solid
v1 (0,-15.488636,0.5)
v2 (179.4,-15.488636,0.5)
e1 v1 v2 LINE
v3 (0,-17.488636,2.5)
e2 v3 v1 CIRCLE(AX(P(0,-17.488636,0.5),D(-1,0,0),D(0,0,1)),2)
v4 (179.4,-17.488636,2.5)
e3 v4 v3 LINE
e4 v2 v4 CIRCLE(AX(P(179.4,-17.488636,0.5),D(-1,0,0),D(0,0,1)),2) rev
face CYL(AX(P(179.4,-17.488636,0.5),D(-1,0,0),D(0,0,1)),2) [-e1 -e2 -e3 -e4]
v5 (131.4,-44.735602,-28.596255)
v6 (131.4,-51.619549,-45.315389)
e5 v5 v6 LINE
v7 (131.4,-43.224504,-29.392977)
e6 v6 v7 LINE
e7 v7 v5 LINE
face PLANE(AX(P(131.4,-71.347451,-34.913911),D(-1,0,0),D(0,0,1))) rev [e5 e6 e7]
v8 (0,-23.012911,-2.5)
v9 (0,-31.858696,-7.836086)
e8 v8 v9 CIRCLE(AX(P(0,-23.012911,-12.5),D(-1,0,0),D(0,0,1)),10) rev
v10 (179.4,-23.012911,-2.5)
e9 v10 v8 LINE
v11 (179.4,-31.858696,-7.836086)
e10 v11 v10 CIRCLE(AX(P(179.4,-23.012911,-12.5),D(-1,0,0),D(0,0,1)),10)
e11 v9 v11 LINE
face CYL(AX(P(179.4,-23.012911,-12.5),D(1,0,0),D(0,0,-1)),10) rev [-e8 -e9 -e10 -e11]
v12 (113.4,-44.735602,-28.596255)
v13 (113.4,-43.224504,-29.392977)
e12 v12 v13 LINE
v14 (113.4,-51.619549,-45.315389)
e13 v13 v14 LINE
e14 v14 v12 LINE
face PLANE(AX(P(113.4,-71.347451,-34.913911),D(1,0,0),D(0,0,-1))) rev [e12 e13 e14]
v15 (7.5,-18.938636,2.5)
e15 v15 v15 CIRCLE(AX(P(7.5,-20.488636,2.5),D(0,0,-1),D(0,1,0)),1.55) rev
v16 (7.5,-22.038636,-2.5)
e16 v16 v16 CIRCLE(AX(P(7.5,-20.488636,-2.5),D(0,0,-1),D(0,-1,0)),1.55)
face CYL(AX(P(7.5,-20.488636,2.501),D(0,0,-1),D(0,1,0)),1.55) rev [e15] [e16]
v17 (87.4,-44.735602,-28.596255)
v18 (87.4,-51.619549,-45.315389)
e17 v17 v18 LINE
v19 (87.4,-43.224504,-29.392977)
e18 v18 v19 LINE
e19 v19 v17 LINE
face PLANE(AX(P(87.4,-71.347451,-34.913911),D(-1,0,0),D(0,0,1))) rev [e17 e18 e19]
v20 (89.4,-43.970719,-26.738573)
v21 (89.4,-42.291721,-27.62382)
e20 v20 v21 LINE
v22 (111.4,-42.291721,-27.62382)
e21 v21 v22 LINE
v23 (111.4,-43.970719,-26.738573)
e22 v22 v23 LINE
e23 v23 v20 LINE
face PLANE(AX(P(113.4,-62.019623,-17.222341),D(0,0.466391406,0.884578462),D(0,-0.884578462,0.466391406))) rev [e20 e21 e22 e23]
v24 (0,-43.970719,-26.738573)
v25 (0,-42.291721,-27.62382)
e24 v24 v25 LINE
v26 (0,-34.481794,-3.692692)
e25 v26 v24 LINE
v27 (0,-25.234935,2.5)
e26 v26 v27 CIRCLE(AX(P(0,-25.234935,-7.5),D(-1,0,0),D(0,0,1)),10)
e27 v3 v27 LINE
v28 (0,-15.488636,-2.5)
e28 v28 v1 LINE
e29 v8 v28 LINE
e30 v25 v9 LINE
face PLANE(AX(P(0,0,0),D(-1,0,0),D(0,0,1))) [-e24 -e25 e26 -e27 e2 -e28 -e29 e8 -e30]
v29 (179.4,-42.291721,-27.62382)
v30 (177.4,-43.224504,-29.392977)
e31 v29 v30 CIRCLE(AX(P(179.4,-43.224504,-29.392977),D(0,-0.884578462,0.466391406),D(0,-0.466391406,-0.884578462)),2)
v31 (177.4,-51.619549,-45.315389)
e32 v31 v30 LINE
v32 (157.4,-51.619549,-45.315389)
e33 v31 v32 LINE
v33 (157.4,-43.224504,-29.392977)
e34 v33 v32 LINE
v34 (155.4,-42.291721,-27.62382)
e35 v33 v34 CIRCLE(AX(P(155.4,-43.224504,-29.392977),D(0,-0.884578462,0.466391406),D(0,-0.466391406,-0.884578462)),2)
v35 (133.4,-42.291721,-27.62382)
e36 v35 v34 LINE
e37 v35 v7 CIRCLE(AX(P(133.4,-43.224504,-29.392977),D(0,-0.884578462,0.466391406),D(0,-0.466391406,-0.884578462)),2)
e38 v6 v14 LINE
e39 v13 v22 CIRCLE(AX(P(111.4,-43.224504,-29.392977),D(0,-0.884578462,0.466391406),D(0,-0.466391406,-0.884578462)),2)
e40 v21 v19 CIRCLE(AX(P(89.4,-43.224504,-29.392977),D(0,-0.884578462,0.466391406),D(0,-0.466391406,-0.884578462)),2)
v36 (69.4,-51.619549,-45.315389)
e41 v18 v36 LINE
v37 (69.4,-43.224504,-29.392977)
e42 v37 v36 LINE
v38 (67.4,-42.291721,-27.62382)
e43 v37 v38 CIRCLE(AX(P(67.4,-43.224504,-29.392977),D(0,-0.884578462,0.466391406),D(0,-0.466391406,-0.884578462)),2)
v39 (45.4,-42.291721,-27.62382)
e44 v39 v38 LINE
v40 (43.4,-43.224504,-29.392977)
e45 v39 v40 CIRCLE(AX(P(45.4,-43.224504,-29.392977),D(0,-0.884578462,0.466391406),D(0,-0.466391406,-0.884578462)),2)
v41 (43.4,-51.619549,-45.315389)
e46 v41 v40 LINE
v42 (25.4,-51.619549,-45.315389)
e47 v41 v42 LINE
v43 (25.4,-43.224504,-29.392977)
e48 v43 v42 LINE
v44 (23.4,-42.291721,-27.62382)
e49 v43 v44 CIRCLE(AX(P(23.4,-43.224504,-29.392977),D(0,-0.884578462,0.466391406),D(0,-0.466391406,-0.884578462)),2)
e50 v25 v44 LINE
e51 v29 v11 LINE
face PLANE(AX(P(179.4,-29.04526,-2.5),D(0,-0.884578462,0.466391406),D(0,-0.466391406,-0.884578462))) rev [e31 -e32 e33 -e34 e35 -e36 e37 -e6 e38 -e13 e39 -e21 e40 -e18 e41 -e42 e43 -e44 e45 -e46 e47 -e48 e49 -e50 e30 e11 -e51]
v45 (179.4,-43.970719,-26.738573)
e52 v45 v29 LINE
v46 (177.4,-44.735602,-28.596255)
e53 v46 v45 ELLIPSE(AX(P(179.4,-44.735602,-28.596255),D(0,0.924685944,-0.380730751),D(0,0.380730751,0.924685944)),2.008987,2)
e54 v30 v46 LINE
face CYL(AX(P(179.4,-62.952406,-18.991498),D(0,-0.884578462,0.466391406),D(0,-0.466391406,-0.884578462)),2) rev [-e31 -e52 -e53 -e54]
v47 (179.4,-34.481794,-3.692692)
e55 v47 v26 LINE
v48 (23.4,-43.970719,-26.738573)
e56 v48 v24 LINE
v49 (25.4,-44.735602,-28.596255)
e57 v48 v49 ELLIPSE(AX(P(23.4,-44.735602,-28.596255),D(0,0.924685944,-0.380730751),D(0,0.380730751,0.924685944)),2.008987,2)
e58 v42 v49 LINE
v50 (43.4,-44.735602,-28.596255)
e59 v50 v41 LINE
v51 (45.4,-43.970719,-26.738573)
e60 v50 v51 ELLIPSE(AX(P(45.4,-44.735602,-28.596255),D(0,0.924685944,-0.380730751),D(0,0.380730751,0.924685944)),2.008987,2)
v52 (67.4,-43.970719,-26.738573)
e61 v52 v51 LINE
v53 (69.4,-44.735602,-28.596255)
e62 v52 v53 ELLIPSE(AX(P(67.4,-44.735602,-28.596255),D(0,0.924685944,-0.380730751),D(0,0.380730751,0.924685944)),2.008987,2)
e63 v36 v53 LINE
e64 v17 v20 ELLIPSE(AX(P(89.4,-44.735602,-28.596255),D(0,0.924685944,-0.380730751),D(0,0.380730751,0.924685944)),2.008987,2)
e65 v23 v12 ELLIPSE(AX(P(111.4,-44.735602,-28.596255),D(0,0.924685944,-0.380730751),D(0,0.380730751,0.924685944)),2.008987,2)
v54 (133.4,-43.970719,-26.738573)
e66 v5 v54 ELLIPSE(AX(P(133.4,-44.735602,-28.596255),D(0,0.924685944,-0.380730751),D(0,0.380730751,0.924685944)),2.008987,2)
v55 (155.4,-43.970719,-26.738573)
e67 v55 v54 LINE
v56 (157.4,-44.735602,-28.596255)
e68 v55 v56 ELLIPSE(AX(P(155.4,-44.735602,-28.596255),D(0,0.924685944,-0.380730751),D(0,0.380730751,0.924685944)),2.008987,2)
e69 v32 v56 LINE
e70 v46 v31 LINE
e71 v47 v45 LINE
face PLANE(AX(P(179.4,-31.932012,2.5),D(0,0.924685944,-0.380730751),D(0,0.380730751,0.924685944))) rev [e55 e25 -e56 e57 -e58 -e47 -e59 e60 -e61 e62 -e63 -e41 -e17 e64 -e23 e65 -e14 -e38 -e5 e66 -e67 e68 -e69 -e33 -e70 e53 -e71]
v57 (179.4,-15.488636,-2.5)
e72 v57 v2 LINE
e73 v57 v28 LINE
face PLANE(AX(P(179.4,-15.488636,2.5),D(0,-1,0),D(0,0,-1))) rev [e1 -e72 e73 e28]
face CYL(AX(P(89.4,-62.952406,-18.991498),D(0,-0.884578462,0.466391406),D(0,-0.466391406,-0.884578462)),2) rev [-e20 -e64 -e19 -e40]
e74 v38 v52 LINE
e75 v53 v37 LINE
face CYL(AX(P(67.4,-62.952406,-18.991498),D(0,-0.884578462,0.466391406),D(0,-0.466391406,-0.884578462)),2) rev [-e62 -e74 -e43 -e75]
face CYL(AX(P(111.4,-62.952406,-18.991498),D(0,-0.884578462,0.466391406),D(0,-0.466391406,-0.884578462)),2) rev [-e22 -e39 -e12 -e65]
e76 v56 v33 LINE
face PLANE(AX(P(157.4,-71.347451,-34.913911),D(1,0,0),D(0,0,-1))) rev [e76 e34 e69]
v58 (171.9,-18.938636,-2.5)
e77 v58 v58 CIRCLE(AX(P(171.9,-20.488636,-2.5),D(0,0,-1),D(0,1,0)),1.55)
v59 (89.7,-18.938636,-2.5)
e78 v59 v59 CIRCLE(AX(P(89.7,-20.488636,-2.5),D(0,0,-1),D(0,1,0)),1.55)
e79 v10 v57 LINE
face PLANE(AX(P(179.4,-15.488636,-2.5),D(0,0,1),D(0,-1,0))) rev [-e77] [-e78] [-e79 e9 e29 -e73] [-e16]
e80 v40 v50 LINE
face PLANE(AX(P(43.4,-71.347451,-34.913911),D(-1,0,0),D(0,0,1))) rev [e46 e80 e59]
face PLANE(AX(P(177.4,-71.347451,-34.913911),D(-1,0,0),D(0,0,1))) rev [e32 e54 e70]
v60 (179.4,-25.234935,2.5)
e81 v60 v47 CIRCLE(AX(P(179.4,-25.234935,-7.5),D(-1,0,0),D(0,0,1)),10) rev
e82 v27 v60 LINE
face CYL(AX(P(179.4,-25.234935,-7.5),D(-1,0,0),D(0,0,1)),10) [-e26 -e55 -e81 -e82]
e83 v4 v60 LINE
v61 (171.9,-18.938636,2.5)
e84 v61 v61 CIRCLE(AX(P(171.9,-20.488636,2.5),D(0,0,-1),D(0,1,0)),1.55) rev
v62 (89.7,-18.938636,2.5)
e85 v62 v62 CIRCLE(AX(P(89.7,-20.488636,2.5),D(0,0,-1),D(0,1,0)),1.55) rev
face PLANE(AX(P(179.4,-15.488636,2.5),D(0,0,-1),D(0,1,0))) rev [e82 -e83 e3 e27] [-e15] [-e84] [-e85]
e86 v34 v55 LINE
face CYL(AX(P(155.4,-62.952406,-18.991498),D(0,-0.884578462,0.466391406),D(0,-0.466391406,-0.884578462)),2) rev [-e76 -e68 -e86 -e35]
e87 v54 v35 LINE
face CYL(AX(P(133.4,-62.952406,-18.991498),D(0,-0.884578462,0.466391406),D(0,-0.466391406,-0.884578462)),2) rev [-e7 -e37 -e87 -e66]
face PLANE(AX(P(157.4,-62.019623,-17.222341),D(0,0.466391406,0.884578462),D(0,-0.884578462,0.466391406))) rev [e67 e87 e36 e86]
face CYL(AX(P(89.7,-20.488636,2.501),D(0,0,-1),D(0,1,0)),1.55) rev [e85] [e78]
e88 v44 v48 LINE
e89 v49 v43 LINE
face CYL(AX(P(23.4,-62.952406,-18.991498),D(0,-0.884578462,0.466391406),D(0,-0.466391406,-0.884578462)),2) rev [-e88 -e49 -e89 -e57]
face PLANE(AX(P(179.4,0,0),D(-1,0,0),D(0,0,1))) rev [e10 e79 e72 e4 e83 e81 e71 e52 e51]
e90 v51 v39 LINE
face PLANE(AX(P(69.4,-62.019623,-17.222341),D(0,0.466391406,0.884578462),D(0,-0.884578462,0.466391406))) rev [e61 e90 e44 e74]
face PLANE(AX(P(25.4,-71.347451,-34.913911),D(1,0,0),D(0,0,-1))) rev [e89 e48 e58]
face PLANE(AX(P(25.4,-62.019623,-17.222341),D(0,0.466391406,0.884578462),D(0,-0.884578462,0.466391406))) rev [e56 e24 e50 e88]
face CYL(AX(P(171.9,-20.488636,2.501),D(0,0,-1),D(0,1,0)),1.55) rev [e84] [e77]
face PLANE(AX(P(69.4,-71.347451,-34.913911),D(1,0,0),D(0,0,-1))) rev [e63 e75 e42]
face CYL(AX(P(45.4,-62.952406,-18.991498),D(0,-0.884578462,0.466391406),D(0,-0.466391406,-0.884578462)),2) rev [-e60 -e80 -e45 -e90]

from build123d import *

# Parameters (mm, degrees)
BOSS_EXTRUDE1_DEPTH = 179.4
FILLET3_R           = 10
CUT_EXTRUDE3_REACH  = 193.526
SKETCH4_R           = 1.55
CUT_EXTRUDE5_REACH  = 192.528
SKETCH7_W           = 26
SKETCH7_H           = 20
SKETCH7_W_2         = 25.4
SKETCH7_W_3         = 2
FILLET6_R           = 2
FILLET7_R           = 2


with BuildPart() as part:
    # Sketch1 → Boss-Extrude1 (new body)
    with BuildSketch(Plane(origin=(0, 0, 0), x_dir=(0, 0, -1), z_dir=(1, 0, 0))):
        Polygon((-2.5, -15.488635846), (-2.5, -31.932011519), (45.315389352, -51.619548933), (2.5, -29.045260173), (2.5, -15.488635846), align=None)
    extrude(amount=BOSS_EXTRUDE1_DEPTH)

    # Fillet3
    fillet3_edges = [part.edges().sort_by_distance(p)[0] for p in [
        (89.7, -29.045260173, -2.5),
        (89.7, -31.932011519, 2.5),
    ]]
    fillet(fillet3_edges, radius=FILLET3_R)

    # Sketch4 → Cut-Extrude3 (cut, up to next)
    with BuildSketch(Plane(origin=(0, 0, -2.5), x_dir=(-1, 0, 0), z_dir=(0, 0, -1)), mode=Mode.PRIVATE) as cut_extrude3_sk1:
        with Locations(Location((-171.9, -20.488635846, 0), (0, 0, 90))):
            Circle(SKETCH4_R)
    cut_extrude3_tool1 = extrude(cut_extrude3_sk1.sketch, amount=-CUT_EXTRUDE3_REACH, mode=Mode.PRIVATE) & part.part
    # Sketch4 → Cut-Extrude3 (cut, up to next)
    with BuildSketch(Plane(origin=(0, 0, -2.5), x_dir=(-1, 0, 0), z_dir=(0, 0, -1)), mode=Mode.PRIVATE) as cut_extrude3_sk2:
        with Locations(Location((-7.5, -20.488635846, 0), (0, 0, 90))):
            Circle(SKETCH4_R)
    cut_extrude3_tool2 = extrude(cut_extrude3_sk2.sketch, amount=-CUT_EXTRUDE3_REACH, mode=Mode.PRIVATE) & part.part
    # Sketch4 → Cut-Extrude3 (cut, up to next)
    with BuildSketch(Plane(origin=(0, 0, -2.5), x_dir=(-1, 0, 0), z_dir=(0, 0, -1)), mode=Mode.PRIVATE) as cut_extrude3_sk3:
        with Locations(Location((-89.7, -20.488635846, 0), (0, 0, 90))):
            Circle(SKETCH4_R)
    cut_extrude3_tool3 = extrude(cut_extrude3_sk3.sketch, amount=-CUT_EXTRUDE3_REACH, mode=Mode.PRIVATE) & part.part
    add(cut_extrude3_tool1.solids().sort_by_distance((171.9, -20.488636, -2.5))[0], mode=Mode.SUBTRACT)
    add(cut_extrude3_tool2.solids().sort_by_distance((7.5, -20.488636, -2.5))[0], mode=Mode.SUBTRACT)
    add(cut_extrude3_tool3.solids().sort_by_distance((89.7, -20.488636, -2.5))[0], mode=Mode.SUBTRACT)

    # Sketch7 → Cut-Extrude5 (cut, up to next)
    with BuildSketch(Plane(origin=(0, -21.695908288, 11.439104164), x_dir=(1, 0, 0), z_dir=(0, 0.8845784624906722, -0.466391406114691)), mode=Mode.PRIVATE) as cut_extrude5_sk1:
        with Locations((144.4, 54.15993145)):
            Rectangle(SKETCH7_W, SKETCH7_H)
    cut_extrude5_tool1 = extrude(cut_extrude5_sk1.sketch, amount=-CUT_EXTRUDE5_REACH, mode=Mode.PRIVATE) & part.part
    # Sketch7 → Cut-Extrude5 (cut, up to next)
    with BuildSketch(Plane(origin=(0, -21.695908288, 11.439104164), x_dir=(1, 0, 0), z_dir=(0, 0.8845784624906722, -0.466391406114691)), mode=Mode.PRIVATE) as cut_extrude5_sk2:
        with Locations((100.4, 54.15993145)):
            Rectangle(SKETCH7_W, SKETCH7_H)
    cut_extrude5_tool2 = extrude(cut_extrude5_sk2.sketch, amount=-CUT_EXTRUDE5_REACH, mode=Mode.PRIVATE) & part.part
    # Sketch7 → Cut-Extrude5 (cut, up to next)
    with BuildSketch(Plane(origin=(0, -21.695908288, 11.439104164), x_dir=(1, 0, 0), z_dir=(0, 0.8845784624906722, -0.466391406114691)), mode=Mode.PRIVATE) as cut_extrude5_sk3:
        with Locations((56.4, 54.15993145)):
            Rectangle(SKETCH7_W, SKETCH7_H)
    cut_extrude5_tool3 = extrude(cut_extrude5_sk3.sketch, amount=-CUT_EXTRUDE5_REACH, mode=Mode.PRIVATE) & part.part
    # Sketch7 → Cut-Extrude5 (cut, up to next)
    with BuildSketch(Plane(origin=(0, -21.695908288, 11.439104164), x_dir=(1, 0, 0), z_dir=(0, 0.8845784624906722, -0.466391406114691)), mode=Mode.PRIVATE) as cut_extrude5_sk4:
        with Locations((12.7, 54.15993145)):
            Rectangle(SKETCH7_W_2, SKETCH7_H)
    cut_extrude5_tool4 = extrude(cut_extrude5_sk4.sketch, amount=-CUT_EXTRUDE5_REACH, mode=Mode.PRIVATE) & part.part
    # Sketch7 → Cut-Extrude5 (cut, up to next)
    with BuildSketch(Plane(origin=(0, -21.695908288, 11.439104164), x_dir=(1, 0, 0), z_dir=(0, 0.8845784624906722, -0.466391406114691)), mode=Mode.PRIVATE) as cut_extrude5_sk5:
        with Locations((178.4, 54.15993145)):
            Rectangle(SKETCH7_W_3, SKETCH7_H)
    cut_extrude5_tool5 = extrude(cut_extrude5_sk5.sketch, amount=-CUT_EXTRUDE5_REACH, mode=Mode.PRIVATE) & part.part
    add(cut_extrude5_tool1.solids().sort_by_distance((144.4, -46.955635, -36.469605))[0], mode=Mode.SUBTRACT)
    add(cut_extrude5_tool2.solids().sort_by_distance((100.4, -46.955635, -36.469605))[0], mode=Mode.SUBTRACT)
    add(cut_extrude5_tool3.solids().sort_by_distance((56.4, -46.955635, -36.469605))[0], mode=Mode.SUBTRACT)
    add(cut_extrude5_tool4.solids().sort_by_distance((12.7, -46.955635, -36.469605))[0], mode=Mode.SUBTRACT)
    add(cut_extrude5_tool5.solids().sort_by_distance((178.4, -46.955635, -36.469605))[0], mode=Mode.SUBTRACT)

    # Fillet6
    fillet6_edges = [part.edges().sort_by_distance(p)[0] for p in [
        (25.4, -43.131220066, -27.181196576),
        (69.4, -43.131220066, -27.181196576),
        (43.4, -43.131220066, -27.181196576),
        (113.4, -43.131220066, -27.181196576),
        (87.4, -43.131220066, -27.181196576),
        (177.4, -43.131220066, -27.181196576),
        (157.4, -43.131220066, -27.181196576),
        (131.4, -43.131220066, -27.181196576),
    ]]
    fillet(fillet6_edges, radius=FILLET6_R - 0.0001)  # a hair under: the kernel refuses the full size

    # Fillet7
    fillet7_edges = [part.edges().sort_by_distance(p)[0] for p in [
        (89.7, -15.488635846, 2.5),
    ]]
    fillet(fillet7_edges, radius=FILLET7_R)


solid = part.part
